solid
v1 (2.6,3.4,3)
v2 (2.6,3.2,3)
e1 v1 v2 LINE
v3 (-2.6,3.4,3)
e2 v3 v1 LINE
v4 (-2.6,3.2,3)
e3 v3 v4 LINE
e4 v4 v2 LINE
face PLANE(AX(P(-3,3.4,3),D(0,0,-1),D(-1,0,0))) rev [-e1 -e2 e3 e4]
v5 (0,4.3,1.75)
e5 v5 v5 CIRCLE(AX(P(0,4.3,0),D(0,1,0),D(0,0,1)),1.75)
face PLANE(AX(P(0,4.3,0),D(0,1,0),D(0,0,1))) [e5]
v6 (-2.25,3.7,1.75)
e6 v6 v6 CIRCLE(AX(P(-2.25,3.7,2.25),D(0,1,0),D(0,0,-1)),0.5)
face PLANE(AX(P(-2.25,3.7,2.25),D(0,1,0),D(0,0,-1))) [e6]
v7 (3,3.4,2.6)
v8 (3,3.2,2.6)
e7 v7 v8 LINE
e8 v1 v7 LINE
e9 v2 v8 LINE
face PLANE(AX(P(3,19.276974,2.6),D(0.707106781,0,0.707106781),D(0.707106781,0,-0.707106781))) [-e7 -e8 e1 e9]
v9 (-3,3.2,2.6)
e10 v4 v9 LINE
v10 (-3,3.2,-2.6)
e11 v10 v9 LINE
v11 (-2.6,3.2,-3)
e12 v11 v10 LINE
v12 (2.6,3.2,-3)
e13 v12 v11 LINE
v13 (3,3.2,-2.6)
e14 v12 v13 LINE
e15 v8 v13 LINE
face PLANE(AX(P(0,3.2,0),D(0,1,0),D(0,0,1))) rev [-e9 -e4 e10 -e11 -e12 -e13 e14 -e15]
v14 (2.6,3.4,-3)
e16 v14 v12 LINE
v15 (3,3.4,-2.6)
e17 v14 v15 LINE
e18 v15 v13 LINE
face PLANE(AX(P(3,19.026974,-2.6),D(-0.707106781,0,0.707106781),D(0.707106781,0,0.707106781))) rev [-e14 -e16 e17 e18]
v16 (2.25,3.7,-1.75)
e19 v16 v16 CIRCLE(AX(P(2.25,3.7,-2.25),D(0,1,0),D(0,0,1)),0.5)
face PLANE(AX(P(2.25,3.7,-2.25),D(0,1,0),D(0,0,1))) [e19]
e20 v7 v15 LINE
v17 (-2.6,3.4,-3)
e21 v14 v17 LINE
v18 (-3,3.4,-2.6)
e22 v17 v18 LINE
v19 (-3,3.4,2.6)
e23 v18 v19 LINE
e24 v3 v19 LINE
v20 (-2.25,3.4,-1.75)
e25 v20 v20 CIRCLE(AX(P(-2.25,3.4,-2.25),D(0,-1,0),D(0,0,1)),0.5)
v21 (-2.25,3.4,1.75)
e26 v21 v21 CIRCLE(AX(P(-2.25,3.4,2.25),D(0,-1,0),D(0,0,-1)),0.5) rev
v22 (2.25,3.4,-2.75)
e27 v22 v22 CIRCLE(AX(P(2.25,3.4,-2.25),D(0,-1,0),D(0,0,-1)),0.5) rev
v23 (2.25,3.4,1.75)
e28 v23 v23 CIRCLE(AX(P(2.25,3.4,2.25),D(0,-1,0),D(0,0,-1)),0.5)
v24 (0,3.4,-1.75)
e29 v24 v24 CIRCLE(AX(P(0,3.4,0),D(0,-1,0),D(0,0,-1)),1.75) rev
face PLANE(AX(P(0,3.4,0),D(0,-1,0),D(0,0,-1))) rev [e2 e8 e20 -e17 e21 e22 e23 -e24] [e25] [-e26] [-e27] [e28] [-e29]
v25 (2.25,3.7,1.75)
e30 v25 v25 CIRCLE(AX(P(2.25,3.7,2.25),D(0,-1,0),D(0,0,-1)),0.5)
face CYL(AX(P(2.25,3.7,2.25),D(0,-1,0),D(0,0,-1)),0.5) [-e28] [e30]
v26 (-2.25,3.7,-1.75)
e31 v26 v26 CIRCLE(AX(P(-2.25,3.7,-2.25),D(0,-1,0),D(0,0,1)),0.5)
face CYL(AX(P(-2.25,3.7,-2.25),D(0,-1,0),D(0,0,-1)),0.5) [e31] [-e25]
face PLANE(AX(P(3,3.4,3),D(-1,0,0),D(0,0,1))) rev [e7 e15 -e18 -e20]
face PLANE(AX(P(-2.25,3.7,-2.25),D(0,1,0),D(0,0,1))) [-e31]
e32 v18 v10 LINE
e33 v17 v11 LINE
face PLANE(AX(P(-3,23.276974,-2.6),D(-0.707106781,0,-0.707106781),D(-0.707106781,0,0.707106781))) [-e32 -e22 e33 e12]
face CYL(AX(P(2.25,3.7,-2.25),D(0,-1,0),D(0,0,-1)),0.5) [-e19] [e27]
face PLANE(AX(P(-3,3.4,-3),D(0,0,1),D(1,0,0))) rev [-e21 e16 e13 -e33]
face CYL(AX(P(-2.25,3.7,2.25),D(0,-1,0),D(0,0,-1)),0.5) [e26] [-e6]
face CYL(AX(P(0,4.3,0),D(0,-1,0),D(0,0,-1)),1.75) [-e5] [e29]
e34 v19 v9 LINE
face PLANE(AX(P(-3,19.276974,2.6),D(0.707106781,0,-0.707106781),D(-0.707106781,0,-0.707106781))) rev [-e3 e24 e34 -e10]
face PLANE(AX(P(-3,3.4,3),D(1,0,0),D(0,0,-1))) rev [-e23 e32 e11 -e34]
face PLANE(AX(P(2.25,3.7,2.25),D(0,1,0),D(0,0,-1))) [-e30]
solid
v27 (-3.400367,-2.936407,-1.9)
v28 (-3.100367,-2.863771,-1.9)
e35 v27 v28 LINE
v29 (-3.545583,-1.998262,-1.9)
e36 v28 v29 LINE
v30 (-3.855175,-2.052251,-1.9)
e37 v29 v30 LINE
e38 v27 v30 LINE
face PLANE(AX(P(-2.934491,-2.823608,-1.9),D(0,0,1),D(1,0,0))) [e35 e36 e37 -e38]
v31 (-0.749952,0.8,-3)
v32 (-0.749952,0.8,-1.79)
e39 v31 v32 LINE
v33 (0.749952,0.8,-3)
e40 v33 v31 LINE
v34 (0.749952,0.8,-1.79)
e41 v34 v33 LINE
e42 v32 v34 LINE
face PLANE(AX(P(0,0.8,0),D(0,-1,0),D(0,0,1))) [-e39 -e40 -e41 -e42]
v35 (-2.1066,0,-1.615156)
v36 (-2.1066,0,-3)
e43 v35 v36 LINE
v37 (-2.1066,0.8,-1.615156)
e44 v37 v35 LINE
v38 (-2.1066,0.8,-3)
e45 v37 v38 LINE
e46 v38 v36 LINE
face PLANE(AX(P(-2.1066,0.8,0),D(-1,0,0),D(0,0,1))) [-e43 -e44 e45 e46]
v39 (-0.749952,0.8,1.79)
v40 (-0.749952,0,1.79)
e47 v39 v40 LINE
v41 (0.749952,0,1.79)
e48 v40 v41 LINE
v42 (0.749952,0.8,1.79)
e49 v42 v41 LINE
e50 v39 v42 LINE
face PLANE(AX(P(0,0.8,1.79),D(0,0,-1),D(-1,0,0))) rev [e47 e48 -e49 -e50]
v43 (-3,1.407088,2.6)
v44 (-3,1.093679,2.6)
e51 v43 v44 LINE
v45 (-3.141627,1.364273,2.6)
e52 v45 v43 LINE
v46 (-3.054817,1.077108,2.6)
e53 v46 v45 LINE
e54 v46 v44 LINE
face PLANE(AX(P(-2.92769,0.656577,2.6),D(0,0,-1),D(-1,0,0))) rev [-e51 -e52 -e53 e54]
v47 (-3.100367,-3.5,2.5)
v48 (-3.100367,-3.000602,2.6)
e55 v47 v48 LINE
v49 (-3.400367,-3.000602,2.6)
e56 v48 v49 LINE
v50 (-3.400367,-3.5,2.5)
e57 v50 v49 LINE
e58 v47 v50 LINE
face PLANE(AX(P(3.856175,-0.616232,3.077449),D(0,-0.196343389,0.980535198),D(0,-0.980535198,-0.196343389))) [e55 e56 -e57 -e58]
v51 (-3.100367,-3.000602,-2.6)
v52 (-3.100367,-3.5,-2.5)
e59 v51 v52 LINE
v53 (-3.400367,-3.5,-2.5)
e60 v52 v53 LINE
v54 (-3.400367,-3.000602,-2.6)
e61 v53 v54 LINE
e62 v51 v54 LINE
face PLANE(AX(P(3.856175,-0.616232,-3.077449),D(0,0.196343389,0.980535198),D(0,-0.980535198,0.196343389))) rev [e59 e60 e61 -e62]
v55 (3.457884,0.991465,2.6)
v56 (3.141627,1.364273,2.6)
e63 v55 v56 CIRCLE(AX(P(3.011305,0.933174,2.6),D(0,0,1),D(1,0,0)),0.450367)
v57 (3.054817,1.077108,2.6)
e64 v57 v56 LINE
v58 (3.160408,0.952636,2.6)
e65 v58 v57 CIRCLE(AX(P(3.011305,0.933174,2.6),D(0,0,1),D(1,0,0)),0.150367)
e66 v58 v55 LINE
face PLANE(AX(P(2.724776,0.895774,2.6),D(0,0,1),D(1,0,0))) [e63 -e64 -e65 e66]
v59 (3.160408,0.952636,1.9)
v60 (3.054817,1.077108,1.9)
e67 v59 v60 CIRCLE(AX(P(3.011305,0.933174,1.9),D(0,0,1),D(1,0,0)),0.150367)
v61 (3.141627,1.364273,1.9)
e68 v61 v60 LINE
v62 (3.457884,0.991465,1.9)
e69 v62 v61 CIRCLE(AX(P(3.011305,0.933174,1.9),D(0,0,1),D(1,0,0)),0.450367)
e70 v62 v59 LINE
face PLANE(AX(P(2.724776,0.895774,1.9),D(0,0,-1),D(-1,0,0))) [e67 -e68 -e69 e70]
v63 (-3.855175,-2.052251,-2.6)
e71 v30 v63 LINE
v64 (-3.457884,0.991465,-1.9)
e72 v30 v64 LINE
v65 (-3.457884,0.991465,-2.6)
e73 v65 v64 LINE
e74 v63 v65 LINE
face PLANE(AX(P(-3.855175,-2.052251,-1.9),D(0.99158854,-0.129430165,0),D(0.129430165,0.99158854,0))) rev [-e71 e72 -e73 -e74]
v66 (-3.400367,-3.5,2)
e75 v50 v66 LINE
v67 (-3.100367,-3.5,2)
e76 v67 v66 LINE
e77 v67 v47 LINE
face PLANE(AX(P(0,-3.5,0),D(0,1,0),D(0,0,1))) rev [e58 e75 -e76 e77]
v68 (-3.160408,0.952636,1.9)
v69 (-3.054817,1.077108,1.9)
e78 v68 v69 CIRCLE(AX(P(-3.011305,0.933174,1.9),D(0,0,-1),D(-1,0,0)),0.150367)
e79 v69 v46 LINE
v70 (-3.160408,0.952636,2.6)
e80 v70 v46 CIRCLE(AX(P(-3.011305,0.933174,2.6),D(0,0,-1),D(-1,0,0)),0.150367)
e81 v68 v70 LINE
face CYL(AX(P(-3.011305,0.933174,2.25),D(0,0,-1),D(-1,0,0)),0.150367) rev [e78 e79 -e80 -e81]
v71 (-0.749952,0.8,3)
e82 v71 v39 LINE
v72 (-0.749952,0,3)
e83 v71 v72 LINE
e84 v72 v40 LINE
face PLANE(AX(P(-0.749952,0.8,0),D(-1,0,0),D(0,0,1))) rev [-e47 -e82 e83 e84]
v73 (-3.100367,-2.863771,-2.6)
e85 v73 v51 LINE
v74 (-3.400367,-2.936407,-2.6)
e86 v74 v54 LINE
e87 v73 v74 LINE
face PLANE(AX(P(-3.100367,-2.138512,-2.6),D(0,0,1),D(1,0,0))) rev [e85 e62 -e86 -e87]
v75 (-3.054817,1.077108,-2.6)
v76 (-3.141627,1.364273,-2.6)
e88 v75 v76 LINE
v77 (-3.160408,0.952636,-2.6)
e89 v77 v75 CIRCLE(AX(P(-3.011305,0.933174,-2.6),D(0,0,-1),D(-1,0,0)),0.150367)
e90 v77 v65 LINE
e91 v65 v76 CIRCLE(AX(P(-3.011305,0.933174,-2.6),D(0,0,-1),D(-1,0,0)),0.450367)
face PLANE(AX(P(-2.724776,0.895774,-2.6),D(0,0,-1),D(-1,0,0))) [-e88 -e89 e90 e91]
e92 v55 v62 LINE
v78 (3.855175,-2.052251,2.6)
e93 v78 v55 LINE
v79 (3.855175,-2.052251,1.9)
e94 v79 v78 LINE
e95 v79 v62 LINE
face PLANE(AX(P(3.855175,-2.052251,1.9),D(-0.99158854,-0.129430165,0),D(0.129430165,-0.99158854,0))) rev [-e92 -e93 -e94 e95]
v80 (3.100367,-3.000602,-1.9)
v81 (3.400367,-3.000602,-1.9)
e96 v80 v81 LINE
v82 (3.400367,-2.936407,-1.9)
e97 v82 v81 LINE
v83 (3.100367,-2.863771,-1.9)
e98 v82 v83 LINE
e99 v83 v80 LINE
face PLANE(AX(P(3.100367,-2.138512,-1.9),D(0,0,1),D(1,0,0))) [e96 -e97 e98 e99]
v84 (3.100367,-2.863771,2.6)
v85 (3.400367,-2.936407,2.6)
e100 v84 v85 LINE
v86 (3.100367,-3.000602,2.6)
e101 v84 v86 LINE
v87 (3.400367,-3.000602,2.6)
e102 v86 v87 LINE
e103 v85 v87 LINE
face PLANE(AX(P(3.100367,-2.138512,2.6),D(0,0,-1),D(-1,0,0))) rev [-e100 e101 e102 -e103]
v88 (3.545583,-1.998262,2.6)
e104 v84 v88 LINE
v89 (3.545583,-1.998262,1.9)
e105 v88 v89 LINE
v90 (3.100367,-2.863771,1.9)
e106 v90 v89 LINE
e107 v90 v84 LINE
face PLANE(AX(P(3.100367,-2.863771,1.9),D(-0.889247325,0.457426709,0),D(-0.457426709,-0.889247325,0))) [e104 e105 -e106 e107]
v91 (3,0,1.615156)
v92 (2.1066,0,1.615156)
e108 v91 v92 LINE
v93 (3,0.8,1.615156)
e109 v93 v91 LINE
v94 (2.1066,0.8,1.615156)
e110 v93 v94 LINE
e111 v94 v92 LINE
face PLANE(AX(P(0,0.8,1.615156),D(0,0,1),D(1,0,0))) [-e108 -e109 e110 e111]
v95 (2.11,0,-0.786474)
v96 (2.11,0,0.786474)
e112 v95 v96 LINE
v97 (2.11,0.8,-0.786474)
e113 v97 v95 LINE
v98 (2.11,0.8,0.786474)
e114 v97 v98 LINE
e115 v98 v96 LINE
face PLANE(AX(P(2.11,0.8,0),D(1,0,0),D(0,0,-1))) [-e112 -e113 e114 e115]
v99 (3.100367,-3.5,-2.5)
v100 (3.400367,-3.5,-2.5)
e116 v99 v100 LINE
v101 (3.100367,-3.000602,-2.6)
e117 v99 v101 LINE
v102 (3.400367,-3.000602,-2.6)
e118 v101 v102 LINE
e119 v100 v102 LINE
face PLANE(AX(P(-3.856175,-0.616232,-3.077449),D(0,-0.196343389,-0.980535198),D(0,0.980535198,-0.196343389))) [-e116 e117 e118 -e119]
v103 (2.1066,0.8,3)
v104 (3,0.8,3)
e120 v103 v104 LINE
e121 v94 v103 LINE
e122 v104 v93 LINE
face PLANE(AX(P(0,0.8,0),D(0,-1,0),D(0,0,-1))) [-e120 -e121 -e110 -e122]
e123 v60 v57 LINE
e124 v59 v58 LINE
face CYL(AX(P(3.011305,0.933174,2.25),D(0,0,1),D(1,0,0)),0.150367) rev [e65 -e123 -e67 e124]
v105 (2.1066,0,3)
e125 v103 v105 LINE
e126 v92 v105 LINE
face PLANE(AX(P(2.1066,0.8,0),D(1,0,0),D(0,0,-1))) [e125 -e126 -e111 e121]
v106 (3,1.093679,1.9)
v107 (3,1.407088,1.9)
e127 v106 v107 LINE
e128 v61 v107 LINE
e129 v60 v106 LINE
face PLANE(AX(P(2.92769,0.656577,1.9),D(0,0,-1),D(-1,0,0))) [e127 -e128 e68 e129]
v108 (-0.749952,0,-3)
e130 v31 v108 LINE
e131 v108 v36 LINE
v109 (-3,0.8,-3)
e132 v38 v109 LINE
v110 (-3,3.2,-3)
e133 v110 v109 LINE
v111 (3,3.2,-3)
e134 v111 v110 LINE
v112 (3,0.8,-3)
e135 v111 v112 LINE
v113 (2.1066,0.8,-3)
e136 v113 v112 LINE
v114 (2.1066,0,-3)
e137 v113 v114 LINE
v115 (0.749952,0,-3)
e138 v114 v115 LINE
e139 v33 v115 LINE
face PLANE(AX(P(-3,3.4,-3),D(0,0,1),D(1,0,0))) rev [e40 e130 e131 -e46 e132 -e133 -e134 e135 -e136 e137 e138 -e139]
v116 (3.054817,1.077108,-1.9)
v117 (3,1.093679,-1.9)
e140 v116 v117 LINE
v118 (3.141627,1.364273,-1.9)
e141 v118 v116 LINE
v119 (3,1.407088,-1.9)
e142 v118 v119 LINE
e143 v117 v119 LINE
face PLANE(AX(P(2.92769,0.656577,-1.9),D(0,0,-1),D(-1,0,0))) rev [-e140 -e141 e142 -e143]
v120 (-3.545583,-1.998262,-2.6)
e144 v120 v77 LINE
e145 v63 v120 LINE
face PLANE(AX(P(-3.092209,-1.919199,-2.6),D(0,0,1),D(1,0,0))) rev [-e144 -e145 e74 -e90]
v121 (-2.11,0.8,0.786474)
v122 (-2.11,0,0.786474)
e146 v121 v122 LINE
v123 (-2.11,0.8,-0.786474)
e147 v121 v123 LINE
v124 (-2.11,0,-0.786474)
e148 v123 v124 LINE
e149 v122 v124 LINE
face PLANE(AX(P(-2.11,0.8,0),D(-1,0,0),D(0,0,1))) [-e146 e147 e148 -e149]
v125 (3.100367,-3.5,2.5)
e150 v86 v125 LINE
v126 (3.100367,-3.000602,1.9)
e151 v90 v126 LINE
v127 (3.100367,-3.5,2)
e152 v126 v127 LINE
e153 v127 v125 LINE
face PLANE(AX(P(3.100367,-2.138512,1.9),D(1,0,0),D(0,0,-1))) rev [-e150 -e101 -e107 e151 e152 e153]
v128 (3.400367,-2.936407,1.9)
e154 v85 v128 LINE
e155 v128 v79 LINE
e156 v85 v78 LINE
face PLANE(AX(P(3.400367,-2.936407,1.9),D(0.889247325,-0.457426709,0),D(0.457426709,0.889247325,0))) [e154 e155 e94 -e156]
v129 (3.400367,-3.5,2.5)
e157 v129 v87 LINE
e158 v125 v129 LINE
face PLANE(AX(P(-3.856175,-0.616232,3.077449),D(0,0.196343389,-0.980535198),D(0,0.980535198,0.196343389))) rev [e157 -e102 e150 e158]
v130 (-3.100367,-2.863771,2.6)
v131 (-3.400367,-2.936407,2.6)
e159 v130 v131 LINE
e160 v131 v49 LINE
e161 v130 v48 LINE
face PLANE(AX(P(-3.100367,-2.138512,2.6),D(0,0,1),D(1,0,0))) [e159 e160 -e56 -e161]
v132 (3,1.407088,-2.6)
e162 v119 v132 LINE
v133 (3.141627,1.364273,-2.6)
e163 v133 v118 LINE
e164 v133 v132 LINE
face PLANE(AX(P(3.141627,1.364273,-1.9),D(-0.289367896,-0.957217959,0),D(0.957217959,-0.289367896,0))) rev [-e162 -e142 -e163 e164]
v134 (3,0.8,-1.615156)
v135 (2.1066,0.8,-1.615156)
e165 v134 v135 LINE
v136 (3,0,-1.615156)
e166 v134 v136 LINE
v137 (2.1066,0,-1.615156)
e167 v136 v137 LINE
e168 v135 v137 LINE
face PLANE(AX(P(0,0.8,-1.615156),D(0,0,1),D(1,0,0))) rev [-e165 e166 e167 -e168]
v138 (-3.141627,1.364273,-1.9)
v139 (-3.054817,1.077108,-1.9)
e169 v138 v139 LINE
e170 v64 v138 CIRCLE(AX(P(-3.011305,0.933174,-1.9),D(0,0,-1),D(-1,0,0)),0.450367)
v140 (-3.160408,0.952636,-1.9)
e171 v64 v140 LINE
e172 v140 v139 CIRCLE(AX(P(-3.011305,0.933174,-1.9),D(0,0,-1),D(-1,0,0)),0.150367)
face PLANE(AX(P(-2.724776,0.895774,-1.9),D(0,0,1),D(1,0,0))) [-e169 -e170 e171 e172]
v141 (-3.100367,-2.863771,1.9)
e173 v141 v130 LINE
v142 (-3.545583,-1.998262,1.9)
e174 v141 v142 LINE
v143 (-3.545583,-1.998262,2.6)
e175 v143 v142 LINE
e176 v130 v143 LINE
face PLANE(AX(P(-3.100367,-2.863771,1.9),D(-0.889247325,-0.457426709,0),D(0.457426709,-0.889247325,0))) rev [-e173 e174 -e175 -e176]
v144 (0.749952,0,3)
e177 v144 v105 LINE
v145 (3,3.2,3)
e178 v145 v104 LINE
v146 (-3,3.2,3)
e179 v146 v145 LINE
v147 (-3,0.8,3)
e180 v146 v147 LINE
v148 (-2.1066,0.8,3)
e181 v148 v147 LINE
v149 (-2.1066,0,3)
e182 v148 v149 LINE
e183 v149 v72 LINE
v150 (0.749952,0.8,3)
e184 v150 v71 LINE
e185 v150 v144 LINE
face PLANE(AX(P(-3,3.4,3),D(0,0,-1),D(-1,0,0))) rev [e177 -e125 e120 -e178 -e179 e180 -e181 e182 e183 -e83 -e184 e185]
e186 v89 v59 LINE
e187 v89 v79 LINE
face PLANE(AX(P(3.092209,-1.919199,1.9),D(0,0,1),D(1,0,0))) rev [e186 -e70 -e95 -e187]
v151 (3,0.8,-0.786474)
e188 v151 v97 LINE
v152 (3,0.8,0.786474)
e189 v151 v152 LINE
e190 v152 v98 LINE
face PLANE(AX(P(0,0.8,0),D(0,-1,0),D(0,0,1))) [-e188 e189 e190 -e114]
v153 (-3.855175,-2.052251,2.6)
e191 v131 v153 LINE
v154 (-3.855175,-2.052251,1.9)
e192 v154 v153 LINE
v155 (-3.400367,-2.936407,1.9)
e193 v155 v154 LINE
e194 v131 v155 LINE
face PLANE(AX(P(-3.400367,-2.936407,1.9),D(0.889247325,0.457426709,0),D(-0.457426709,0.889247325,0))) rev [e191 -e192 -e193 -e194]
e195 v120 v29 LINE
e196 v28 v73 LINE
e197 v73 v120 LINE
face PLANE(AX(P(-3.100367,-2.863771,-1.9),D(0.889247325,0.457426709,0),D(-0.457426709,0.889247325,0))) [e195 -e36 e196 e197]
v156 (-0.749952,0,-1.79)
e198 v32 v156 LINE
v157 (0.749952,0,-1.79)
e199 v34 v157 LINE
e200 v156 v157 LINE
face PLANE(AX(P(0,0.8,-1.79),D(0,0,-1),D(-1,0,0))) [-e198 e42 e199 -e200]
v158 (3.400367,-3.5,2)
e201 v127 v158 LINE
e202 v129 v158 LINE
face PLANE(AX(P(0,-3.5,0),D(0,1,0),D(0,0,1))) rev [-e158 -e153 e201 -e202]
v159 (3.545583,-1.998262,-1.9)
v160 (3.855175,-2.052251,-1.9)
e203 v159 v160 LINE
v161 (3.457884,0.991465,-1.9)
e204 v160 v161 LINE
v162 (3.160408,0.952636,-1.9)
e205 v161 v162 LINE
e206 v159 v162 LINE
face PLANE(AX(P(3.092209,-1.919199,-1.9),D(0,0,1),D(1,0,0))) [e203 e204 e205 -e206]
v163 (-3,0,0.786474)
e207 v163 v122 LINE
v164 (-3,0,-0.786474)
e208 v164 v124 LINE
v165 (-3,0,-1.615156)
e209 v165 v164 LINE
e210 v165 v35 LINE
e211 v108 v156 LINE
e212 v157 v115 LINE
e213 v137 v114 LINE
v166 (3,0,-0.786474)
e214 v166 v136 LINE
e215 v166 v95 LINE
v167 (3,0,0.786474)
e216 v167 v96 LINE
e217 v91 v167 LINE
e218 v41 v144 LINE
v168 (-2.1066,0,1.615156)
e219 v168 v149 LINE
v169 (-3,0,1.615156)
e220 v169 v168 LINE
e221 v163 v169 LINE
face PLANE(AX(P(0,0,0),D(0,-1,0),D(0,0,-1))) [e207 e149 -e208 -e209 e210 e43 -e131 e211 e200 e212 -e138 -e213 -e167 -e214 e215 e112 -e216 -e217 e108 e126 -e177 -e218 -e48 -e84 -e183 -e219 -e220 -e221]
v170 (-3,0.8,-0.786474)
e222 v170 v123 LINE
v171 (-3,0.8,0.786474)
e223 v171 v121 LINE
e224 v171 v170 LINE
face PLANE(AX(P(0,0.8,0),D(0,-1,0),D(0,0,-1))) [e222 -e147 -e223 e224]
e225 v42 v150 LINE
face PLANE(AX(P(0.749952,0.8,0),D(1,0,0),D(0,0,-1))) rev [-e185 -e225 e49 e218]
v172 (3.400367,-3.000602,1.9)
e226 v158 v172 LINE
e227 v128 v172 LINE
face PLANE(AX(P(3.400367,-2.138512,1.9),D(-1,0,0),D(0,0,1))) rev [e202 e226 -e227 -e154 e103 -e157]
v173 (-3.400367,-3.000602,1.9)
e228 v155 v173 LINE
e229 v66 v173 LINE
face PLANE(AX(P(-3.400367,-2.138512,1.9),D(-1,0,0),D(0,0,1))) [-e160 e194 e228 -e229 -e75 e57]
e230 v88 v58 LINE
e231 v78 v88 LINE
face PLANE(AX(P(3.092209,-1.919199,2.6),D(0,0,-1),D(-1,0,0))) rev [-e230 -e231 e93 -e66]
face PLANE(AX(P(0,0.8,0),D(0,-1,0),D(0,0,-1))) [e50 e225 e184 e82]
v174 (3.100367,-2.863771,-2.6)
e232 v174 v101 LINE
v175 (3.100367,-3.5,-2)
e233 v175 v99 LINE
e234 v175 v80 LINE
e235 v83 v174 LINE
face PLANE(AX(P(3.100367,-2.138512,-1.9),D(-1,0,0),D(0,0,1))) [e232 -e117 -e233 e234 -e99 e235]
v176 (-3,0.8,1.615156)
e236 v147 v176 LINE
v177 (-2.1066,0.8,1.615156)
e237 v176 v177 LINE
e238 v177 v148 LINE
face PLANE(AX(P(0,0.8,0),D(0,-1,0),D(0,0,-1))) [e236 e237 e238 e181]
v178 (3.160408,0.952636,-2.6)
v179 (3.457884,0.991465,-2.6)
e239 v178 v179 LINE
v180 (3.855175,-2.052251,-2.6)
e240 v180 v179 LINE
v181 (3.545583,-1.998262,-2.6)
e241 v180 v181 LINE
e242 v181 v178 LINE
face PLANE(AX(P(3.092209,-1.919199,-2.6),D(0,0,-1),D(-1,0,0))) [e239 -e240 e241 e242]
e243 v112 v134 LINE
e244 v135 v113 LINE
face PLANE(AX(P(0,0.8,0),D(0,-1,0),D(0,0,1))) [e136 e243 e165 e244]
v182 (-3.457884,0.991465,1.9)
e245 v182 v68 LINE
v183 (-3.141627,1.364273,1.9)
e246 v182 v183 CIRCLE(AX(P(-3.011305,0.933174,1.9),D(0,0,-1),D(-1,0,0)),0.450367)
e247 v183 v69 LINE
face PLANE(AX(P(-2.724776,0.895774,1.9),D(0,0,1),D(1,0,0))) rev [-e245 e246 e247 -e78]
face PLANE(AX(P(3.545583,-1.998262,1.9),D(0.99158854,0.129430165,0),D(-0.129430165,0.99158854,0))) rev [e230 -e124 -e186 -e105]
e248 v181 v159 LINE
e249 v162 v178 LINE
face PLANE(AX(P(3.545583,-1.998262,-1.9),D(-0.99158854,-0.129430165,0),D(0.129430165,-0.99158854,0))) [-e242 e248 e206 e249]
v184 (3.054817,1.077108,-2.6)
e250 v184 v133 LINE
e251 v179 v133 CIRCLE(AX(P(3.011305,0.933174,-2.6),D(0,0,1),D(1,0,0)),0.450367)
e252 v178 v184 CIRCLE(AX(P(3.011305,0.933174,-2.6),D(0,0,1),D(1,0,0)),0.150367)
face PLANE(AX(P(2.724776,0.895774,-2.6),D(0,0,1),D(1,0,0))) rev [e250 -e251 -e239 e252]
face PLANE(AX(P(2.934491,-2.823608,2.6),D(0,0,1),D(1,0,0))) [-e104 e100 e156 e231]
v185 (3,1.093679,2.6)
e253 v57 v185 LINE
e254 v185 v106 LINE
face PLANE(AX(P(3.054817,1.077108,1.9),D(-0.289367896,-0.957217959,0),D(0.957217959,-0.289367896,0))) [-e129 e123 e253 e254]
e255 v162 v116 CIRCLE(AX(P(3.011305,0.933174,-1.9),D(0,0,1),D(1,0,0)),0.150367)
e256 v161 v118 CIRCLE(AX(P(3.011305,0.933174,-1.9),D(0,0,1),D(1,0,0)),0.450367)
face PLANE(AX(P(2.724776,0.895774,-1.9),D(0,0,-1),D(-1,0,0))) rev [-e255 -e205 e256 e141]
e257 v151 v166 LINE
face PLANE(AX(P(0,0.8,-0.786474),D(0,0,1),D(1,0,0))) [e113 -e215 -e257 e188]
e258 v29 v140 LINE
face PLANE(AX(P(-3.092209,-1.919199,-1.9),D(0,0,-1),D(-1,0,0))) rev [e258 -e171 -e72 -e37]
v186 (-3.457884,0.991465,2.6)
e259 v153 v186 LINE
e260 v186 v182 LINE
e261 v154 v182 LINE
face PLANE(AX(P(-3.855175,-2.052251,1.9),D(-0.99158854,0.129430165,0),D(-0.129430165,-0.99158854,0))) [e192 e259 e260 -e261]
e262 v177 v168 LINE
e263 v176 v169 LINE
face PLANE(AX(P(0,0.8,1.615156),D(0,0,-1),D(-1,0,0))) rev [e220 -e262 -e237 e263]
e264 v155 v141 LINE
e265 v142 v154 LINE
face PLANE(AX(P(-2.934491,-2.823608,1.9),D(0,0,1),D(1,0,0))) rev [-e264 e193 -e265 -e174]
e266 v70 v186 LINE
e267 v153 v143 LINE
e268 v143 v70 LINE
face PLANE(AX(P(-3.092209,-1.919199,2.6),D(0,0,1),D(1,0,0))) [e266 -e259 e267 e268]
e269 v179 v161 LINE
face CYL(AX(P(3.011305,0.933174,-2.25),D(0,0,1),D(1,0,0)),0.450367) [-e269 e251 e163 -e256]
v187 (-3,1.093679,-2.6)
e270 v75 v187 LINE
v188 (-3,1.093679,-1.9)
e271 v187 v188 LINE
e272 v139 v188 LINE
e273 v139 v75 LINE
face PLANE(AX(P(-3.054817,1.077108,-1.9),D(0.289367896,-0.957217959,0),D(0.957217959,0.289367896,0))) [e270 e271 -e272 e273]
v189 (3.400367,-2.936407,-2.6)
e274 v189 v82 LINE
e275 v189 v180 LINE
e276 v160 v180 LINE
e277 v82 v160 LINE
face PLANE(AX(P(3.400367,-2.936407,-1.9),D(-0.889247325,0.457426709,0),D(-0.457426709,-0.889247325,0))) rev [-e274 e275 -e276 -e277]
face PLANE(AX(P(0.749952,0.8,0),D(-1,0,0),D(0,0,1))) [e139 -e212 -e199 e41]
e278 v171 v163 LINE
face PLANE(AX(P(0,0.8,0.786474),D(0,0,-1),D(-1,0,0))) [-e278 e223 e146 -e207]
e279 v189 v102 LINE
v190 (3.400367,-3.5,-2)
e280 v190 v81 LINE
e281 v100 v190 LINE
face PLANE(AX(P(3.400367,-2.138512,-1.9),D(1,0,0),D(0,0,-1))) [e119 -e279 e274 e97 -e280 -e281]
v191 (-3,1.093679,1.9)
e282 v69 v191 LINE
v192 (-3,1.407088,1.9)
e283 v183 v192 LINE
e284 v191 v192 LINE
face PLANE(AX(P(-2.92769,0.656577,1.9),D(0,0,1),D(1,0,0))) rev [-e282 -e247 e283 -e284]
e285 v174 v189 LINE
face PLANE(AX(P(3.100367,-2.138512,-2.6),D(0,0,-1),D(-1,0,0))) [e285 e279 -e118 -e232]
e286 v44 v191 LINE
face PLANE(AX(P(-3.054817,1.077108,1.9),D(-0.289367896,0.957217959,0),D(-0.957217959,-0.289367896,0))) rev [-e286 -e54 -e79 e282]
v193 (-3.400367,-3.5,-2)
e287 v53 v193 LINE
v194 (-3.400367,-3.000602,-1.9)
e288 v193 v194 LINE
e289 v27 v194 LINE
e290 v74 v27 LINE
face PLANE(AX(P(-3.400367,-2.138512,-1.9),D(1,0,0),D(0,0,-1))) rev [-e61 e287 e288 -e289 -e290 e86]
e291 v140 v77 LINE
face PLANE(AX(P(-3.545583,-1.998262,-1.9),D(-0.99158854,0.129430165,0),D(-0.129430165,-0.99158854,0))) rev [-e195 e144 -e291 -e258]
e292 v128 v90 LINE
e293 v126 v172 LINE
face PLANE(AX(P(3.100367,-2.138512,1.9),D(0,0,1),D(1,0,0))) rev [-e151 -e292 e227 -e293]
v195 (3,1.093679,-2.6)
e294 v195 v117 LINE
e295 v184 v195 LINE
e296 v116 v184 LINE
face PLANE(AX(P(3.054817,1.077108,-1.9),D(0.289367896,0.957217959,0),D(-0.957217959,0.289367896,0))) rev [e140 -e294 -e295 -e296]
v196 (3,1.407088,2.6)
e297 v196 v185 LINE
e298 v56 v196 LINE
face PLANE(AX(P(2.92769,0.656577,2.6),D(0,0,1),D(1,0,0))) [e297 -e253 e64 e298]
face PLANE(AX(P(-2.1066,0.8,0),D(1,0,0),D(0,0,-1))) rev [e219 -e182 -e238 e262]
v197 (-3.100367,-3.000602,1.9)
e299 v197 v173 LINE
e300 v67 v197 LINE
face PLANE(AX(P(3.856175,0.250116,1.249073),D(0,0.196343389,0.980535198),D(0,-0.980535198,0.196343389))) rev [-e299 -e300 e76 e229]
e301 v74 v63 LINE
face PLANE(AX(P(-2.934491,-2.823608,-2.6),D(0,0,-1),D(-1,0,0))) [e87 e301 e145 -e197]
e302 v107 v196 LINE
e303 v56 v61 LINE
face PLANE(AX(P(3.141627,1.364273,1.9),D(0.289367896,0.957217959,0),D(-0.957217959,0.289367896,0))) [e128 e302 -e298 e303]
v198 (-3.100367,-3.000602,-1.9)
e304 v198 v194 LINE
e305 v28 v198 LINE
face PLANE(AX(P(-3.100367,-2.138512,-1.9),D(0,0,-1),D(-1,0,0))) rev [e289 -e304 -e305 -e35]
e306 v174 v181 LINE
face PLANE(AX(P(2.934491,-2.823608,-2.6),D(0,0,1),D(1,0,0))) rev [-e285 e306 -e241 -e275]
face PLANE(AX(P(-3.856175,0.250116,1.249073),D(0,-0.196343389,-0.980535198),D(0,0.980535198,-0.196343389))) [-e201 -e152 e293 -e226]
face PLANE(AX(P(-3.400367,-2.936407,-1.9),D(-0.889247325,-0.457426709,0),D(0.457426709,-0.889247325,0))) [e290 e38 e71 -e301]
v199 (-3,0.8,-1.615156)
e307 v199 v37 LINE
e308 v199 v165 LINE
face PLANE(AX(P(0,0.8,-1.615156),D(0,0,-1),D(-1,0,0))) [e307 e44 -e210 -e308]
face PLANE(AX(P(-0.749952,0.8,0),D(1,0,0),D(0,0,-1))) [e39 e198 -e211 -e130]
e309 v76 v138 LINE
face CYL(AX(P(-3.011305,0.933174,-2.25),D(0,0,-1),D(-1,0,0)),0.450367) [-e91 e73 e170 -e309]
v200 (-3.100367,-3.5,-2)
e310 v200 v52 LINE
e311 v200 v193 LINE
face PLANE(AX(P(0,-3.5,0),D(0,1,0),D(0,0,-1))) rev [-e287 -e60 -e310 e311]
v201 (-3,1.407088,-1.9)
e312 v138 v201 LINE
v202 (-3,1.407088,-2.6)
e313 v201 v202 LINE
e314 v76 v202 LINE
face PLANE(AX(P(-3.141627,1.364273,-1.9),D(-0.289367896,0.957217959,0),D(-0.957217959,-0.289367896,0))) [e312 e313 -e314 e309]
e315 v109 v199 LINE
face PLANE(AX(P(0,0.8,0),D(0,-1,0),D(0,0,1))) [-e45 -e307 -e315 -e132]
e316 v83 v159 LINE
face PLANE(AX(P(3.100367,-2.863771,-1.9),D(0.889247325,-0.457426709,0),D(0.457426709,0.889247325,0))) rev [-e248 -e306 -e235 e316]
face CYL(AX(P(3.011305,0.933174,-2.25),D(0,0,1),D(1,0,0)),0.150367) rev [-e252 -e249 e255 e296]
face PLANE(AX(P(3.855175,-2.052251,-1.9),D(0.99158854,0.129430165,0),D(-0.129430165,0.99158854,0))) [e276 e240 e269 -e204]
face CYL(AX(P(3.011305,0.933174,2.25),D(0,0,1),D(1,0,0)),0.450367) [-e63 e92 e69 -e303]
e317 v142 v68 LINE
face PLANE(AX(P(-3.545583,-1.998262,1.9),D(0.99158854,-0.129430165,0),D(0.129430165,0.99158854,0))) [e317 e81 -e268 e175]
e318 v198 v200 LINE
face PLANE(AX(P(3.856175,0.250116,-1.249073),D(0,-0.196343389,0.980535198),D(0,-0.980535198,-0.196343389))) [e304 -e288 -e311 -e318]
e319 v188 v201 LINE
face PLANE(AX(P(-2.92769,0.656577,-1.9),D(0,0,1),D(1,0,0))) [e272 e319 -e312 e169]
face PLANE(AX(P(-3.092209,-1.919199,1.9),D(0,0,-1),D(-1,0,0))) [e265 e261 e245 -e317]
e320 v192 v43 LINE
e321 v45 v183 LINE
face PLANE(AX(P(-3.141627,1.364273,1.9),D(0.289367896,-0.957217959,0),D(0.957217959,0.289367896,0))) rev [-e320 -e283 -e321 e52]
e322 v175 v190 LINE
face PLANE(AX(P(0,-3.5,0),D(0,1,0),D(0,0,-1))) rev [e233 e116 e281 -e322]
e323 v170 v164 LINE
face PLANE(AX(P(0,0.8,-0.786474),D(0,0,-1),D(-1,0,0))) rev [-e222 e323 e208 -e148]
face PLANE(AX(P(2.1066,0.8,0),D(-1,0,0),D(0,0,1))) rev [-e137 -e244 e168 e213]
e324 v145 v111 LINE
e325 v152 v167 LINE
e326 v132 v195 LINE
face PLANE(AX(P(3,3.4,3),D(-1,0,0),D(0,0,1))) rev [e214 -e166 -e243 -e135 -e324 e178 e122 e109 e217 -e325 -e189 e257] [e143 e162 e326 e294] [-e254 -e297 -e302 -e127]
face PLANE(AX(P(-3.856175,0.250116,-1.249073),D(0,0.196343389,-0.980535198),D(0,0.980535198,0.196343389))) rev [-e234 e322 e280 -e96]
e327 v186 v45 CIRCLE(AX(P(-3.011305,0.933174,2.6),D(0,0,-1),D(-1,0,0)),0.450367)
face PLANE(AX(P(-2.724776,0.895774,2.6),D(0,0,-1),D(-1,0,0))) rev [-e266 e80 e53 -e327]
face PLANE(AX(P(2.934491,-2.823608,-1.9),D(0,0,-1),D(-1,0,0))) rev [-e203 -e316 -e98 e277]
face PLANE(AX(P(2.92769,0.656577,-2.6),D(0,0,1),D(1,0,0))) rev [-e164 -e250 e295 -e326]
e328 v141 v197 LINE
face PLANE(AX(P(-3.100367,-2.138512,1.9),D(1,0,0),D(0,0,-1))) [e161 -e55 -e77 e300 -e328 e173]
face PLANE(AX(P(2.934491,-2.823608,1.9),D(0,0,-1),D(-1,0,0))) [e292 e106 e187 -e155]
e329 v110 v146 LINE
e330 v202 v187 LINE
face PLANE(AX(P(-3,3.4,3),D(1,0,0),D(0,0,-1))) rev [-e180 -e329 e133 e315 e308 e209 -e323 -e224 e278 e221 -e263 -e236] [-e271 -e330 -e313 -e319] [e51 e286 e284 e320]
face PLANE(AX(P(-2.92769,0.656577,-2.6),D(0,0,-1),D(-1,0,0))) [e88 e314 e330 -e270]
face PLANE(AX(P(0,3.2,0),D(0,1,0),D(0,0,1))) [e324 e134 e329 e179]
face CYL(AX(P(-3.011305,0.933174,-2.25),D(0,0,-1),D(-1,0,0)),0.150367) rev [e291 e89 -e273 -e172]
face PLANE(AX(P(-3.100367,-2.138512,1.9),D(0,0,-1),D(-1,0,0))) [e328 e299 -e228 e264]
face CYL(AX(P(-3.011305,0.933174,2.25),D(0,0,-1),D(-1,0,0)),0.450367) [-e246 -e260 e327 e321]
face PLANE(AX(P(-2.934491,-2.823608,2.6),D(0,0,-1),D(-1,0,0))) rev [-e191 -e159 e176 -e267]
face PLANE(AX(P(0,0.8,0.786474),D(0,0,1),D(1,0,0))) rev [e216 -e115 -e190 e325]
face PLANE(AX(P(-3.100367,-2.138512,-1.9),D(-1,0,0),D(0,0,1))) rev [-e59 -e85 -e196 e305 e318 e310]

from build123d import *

# Parameters (mm, degrees)
CROQUIS1_W                  = 6
CROQUIS1_H                  = 6
SALIENTE_EXTRUIR1_DEPTH     = 3.4
CROQUIS2_R                  = 1.75
SALIENTE_EXTRUIR2_DEPTH     = 0.9
BARRER6_START               = 1.9
BARRER6_DEPTH               = 0.7
SIMETR_A2_START             = 1.9
SIMETR_A2_COPY_1_DEPTH      = 0.7
CROQUIS3_R                  = 0.5
SALIENTE_EXTRUIR6_DEPTH     = 0.3
SIMETR_A4_COPY_1_SKETCH_R   = 0.5
SIMETR_A4_COPY_1_DEPTH      = 0.3
CORTAR_EXTRUIR1_START       = -0.2
CORTAR_EXTRUIR1_DEPTH       = 9.654133443
SIMETR_A6_START             = -0.2
SIMETR_A6_COPY_1_DEPTH      = 9.654133443
CROQUIS13_W                 = 1.499904498
CROQUIS13_H                 = 1.21
CORTAR_EXTRUIR2_DEPTH       = 0.8
CROQUIS13_3_W               = 0.893400265
CROQUIS13_3_H               = 1.384843815
CROQUIS13_3_W_2             = 0.89
CROQUIS13_3_H_2             = 0.786473886
CORTAR_EXTRUIR3_DEPTH       = 0.8
SIMETR_A9_COPY_1_SKETCH_W   = 0.893400265
SIMETR_A9_COPY_1_SKETCH_H   = 1.384843815
SIMETR_A9_COPY_1_SKETCH_W_2 = 0.89
SIMETR_A9_COPY_1_SKETCH_H_2 = 0.786473886
SIMETR_A9_COPY_1_DEPTH      = 0.8
CORTAR_EXTRUIR4_DEPTH       = 0.3
SIMETR_A11_COPY_1_DEPTH     = 0.3


# Read off the part's stored shape, not the designer's step: Barrer6
with BuildPart() as part:
    # Croquis1 → Saliente-Extruir1 (new body)
    with BuildSketch(Plane(origin=(0, 0, 0), x_dir=(1, 0, 0), z_dir=(0, 1, 0))):
        Rectangle(CROQUIS1_W, CROQUIS1_H)
    extrude(amount=SALIENTE_EXTRUIR1_DEPTH)

    # Croquis2 → Saliente-Extruir2 (add)
    with BuildSketch(Plane(origin=(0, 3.4, 0), x_dir=(1, 0, 0), z_dir=(0, 1, 0))):
        with Locations(Location((0, 0, 0), (0, 0, 90))):
            Circle(CROQUIS2_R)
    extrude(amount=SALIENTE_EXTRUIR2_DEPTH)

    # Barrer6 outline → Barrer6 (add)
    with BuildSketch(Plane.XY.offset(BARRER6_START)):
        with BuildLine():
            Line((3, 1.407087545), (3, 1.0936793))
            Line((3, 1.0936793), (3.054816861, 1.077108111))
            ThreePointArc((3.054816861, 1.077108111), (3.12597159, 1.030446512), (3.160407685, 0.952636129))
            Line((3.160407685, 0.952636129), (3.545582768, -1.998261735))
            Line((3.545582768, -1.998261735), (3.100367019, -2.863770693))
            Line((3.100367019, -2.863770693), (3.100367019, -3.5))
            Line((3.100367019, -3.5), (3.400367019, -3.5))
            Line((3.400367019, -3.5), (3.400367019, -2.936407033))
            Line((3.400367019, -2.936407033), (3.855174739, -2.052251079))
            Line((3.855174739, -2.052251079), (3.457884247, 0.991465178))
            ThreePointArc((3.457884247, 0.991465178), (3.354744065, 1.224516485), (3.141627229, 1.364273499))
            Line((3.141627229, 1.364273499), (3, 1.407087545))
        make_face()
    barrer6 = extrude(amount=BARRER6_DEPTH)

    # Simetría1: Barrer6 across plane
    add(barrer6.mirror(Plane.XY))

    # Simetría2: Barrer6 across plane
    add(barrer6.mirror(Plane(origin=(0, 0, 0), x_dir=(0, 0, 1), z_dir=(1, 0, 0))))

    # Simetría2 copy 1 sketch → Simetría2 copy 1 (add)
    with BuildSketch(Plane(origin=(0, 0, 0), x_dir=(-1, 0, 0), z_dir=(0, 0, -1)).offset(SIMETR_A2_START)):
        with BuildLine():
            Line((3, 1.407087545), (3, 1.0936793))
            Line((3, 1.0936793), (3.054816861, 1.077108111))
            ThreePointArc((3.054816861, 1.077108111), (3.12597159, 1.030446512), (3.160407685, 0.952636129))
            Line((3.160407685, 0.952636129), (3.545582768, -1.998261735))
            Line((3.545582768, -1.998261735), (3.100367019, -2.863770693))
            Line((3.100367019, -2.863770693), (3.100367019, -3.5))
            Line((3.100367019, -3.5), (3.400367019, -3.5))
            Line((3.400367019, -3.5), (3.400367019, -2.936407033))
            Line((3.400367019, -2.936407033), (3.855174739, -2.052251079))
            Line((3.855174739, -2.052251079), (3.457884247, 0.991465178))
            ThreePointArc((3.457884247, 0.991465178), (3.354744065, 1.224516485), (3.141627229, 1.364273499))
            Line((3.141627229, 1.364273499), (3, 1.407087545))
        make_face()
    extrude(amount=SIMETR_A2_COPY_1_DEPTH)

    # Croquis3 → Saliente-Extruir6 (add)
    with BuildSketch(Plane(origin=(0, 3.4, 0), x_dir=(1, 0, 0), z_dir=(0, 1, 0))):
        with Locations(Location((2.25, 2.25, 0), (0, 0, 90))):
            Circle(CROQUIS3_R)
    saliente_extruir6 = extrude(amount=SALIENTE_EXTRUIR6_DEPTH)

    # Simetría3: Saliente-Extruir6 across plane
    add(saliente_extruir6.mirror(Plane(origin=(0, 0, 0), x_dir=(0, 0, 1), z_dir=(1, 0, 0))))

    # Simetría4: Saliente-Extruir6 across plane
    add(saliente_extruir6.mirror(Plane.XY))

    # Simetría4 copy 1 sketch → Simetría4 copy 1 (add)
    with BuildSketch(Plane(origin=(0, 3.4, 0), x_dir=(-1, 0, 0), z_dir=(0, 1, 0))):
        with Locations(Location((2.25, 2.25, 0), (0, 0, 90))):
            Circle(SIMETR_A4_COPY_1_SKETCH_R)
    extrude(amount=SIMETR_A4_COPY_1_DEPTH)

    # Croquis12 → Cortar-Extruir1 (cut)
    with BuildSketch(Plane(origin=(0, 3.4, 0), x_dir=(1, 0, 0), z_dir=(0, 1, 0)).offset(CORTAR_EXTRUIR1_START)):
        Polygon((-22.58932813, -16.98932813), (-3, 2.6), (-2.6, 3), (16.98932813, 22.58932813), (-22.18932813, 61.767984391), (-61.767984391, 22.18932813), align=None)
    cortar_extruir1 = extrude(amount=CORTAR_EXTRUIR1_DEPTH, mode=Mode.SUBTRACT)

    # Simetría5: Cortar-Extruir1 across plane
    add(cortar_extruir1.mirror(Plane.XY), mode=Mode.SUBTRACT)

    # Simetría6: Cortar-Extruir1 across plane
    add(cortar_extruir1.mirror(Plane(origin=(0, 0, 0), x_dir=(0, 0, 1), z_dir=(1, 0, 0))), mode=Mode.SUBTRACT)

    # Simetría6 copy 1 sketch → Simetría6 copy 1 (cut)
    with BuildSketch(Plane(origin=(0, 3.4, 0), x_dir=(-1, 0, 0), z_dir=(0, 1, 0)).offset(SIMETR_A6_START)):
        Polygon((-22.58932813, -16.98932813), (-3, 2.6), (-2.6, 3), (16.98932813, 22.58932813), (-22.18932813, 61.767984391), (-61.767984391, 22.18932813), align=None)
    extrude(amount=SIMETR_A6_COPY_1_DEPTH, mode=Mode.SUBTRACT)


with BuildPart() as body_2:
    # Partir1: the piece on the far side of the plane
    add(part.part)
    split(bisect_by=Plane.ZX.offset(3.2), keep=Keep.BOTTOM)

    # Croquis13 → Cortar-Extruir2 (cut)
    with BuildSketch(Plane.XZ):
        with Locations((0, 2.395)):
            Rectangle(CROQUIS13_W, CROQUIS13_H)
    cortar_extruir2 = extrude(amount=-CORTAR_EXTRUIR2_DEPTH, mode=Mode.SUBTRACT)

    # Simetría7: Cortar-Extruir2 across plane
    add(cortar_extruir2.mirror(Plane.XY), mode=Mode.SUBTRACT)

    # Croquis13<3> → Cortar-Extruir3 (cut)
    with BuildSketch(Plane.XZ):
        with Locations((-2.553299867, 2.307578093)):
            Rectangle(CROQUIS13_3_W, CROQUIS13_3_H)
        with Locations((-2.555, 0.393236943)):
            Rectangle(CROQUIS13_3_W_2, CROQUIS13_3_H_2)
    cortar_extruir3 = extrude(amount=-CORTAR_EXTRUIR3_DEPTH, mode=Mode.SUBTRACT)

    # Simetría8: Cortar-Extruir3 across plane
    add(cortar_extruir3.mirror(Plane.XY), mode=Mode.SUBTRACT)

    # Simetría9: Cortar-Extruir3 across plane
    add(cortar_extruir3.mirror(Plane(origin=(0, 0, 0), x_dir=(0, 0, 1), z_dir=(1, 0, 0))), mode=Mode.SUBTRACT)

    # Simetría9 copy 1 sketch → Simetría9 copy 1 (cut)
    with BuildSketch(Plane(origin=(0, 0, 0), x_dir=(-1, 0, 0), z_dir=(0, -1, 0))):
        with Locations((-2.553299867, 2.307578093)):
            Rectangle(SIMETR_A9_COPY_1_SKETCH_W, SIMETR_A9_COPY_1_SKETCH_H)
        with Locations((-2.555, 0.393236943)):
            Rectangle(SIMETR_A9_COPY_1_SKETCH_W_2, SIMETR_A9_COPY_1_SKETCH_H_2)
    extrude(amount=-SIMETR_A9_COPY_1_DEPTH, mode=Mode.SUBTRACT)

    # Croquis14 → Cortar-Extruir4 (cut)
    with BuildSketch(Plane(origin=(3.400367019, 0, 0), x_dir=(0, 0, -1), z_dir=(1, 0, 0))):
        Polygon((-2.6, -3.5), (-2.5, -3.5), (-2.6, -3.000601878), align=None)
        Polygon((-1.9, -3.000601878), (-2, -3.5), (-1.9, -3.5), align=None)
    cortar_extruir4 = extrude(amount=-CORTAR_EXTRUIR4_DEPTH, mode=Mode.SUBTRACT)

    # Simetría10: Cortar-Extruir4 across plane
    add(cortar_extruir4.mirror(Plane.XY), mode=Mode.SUBTRACT)

    # Simetría11: Cortar-Extruir4 across plane
    add(cortar_extruir4.mirror(Plane(origin=(0, 0, 0), x_dir=(0, 0, 1), z_dir=(1, 0, 0))), mode=Mode.SUBTRACT)

    # Simetría11 copy 1 sketch → Simetría11 copy 1 (cut)
    with BuildSketch(Plane.ZY.offset(3.400367019)):
        Polygon((-2.6, -3.5), (-2.5, -3.5), (-2.6, -3.000601878), align=None)
        Polygon((-1.9, -3.000601878), (-2, -3.5), (-1.9, -3.5), align=None)
    extrude(amount=-SIMETR_A11_COPY_1_DEPTH, mode=Mode.SUBTRACT)


with BuildPart() as part_1:
    add(part.part)

    # Partir1
    split(bisect_by=Plane.ZX.offset(3.2), keep=Keep.TOP)


solid = Compound([body_2.part, part_1.part])
